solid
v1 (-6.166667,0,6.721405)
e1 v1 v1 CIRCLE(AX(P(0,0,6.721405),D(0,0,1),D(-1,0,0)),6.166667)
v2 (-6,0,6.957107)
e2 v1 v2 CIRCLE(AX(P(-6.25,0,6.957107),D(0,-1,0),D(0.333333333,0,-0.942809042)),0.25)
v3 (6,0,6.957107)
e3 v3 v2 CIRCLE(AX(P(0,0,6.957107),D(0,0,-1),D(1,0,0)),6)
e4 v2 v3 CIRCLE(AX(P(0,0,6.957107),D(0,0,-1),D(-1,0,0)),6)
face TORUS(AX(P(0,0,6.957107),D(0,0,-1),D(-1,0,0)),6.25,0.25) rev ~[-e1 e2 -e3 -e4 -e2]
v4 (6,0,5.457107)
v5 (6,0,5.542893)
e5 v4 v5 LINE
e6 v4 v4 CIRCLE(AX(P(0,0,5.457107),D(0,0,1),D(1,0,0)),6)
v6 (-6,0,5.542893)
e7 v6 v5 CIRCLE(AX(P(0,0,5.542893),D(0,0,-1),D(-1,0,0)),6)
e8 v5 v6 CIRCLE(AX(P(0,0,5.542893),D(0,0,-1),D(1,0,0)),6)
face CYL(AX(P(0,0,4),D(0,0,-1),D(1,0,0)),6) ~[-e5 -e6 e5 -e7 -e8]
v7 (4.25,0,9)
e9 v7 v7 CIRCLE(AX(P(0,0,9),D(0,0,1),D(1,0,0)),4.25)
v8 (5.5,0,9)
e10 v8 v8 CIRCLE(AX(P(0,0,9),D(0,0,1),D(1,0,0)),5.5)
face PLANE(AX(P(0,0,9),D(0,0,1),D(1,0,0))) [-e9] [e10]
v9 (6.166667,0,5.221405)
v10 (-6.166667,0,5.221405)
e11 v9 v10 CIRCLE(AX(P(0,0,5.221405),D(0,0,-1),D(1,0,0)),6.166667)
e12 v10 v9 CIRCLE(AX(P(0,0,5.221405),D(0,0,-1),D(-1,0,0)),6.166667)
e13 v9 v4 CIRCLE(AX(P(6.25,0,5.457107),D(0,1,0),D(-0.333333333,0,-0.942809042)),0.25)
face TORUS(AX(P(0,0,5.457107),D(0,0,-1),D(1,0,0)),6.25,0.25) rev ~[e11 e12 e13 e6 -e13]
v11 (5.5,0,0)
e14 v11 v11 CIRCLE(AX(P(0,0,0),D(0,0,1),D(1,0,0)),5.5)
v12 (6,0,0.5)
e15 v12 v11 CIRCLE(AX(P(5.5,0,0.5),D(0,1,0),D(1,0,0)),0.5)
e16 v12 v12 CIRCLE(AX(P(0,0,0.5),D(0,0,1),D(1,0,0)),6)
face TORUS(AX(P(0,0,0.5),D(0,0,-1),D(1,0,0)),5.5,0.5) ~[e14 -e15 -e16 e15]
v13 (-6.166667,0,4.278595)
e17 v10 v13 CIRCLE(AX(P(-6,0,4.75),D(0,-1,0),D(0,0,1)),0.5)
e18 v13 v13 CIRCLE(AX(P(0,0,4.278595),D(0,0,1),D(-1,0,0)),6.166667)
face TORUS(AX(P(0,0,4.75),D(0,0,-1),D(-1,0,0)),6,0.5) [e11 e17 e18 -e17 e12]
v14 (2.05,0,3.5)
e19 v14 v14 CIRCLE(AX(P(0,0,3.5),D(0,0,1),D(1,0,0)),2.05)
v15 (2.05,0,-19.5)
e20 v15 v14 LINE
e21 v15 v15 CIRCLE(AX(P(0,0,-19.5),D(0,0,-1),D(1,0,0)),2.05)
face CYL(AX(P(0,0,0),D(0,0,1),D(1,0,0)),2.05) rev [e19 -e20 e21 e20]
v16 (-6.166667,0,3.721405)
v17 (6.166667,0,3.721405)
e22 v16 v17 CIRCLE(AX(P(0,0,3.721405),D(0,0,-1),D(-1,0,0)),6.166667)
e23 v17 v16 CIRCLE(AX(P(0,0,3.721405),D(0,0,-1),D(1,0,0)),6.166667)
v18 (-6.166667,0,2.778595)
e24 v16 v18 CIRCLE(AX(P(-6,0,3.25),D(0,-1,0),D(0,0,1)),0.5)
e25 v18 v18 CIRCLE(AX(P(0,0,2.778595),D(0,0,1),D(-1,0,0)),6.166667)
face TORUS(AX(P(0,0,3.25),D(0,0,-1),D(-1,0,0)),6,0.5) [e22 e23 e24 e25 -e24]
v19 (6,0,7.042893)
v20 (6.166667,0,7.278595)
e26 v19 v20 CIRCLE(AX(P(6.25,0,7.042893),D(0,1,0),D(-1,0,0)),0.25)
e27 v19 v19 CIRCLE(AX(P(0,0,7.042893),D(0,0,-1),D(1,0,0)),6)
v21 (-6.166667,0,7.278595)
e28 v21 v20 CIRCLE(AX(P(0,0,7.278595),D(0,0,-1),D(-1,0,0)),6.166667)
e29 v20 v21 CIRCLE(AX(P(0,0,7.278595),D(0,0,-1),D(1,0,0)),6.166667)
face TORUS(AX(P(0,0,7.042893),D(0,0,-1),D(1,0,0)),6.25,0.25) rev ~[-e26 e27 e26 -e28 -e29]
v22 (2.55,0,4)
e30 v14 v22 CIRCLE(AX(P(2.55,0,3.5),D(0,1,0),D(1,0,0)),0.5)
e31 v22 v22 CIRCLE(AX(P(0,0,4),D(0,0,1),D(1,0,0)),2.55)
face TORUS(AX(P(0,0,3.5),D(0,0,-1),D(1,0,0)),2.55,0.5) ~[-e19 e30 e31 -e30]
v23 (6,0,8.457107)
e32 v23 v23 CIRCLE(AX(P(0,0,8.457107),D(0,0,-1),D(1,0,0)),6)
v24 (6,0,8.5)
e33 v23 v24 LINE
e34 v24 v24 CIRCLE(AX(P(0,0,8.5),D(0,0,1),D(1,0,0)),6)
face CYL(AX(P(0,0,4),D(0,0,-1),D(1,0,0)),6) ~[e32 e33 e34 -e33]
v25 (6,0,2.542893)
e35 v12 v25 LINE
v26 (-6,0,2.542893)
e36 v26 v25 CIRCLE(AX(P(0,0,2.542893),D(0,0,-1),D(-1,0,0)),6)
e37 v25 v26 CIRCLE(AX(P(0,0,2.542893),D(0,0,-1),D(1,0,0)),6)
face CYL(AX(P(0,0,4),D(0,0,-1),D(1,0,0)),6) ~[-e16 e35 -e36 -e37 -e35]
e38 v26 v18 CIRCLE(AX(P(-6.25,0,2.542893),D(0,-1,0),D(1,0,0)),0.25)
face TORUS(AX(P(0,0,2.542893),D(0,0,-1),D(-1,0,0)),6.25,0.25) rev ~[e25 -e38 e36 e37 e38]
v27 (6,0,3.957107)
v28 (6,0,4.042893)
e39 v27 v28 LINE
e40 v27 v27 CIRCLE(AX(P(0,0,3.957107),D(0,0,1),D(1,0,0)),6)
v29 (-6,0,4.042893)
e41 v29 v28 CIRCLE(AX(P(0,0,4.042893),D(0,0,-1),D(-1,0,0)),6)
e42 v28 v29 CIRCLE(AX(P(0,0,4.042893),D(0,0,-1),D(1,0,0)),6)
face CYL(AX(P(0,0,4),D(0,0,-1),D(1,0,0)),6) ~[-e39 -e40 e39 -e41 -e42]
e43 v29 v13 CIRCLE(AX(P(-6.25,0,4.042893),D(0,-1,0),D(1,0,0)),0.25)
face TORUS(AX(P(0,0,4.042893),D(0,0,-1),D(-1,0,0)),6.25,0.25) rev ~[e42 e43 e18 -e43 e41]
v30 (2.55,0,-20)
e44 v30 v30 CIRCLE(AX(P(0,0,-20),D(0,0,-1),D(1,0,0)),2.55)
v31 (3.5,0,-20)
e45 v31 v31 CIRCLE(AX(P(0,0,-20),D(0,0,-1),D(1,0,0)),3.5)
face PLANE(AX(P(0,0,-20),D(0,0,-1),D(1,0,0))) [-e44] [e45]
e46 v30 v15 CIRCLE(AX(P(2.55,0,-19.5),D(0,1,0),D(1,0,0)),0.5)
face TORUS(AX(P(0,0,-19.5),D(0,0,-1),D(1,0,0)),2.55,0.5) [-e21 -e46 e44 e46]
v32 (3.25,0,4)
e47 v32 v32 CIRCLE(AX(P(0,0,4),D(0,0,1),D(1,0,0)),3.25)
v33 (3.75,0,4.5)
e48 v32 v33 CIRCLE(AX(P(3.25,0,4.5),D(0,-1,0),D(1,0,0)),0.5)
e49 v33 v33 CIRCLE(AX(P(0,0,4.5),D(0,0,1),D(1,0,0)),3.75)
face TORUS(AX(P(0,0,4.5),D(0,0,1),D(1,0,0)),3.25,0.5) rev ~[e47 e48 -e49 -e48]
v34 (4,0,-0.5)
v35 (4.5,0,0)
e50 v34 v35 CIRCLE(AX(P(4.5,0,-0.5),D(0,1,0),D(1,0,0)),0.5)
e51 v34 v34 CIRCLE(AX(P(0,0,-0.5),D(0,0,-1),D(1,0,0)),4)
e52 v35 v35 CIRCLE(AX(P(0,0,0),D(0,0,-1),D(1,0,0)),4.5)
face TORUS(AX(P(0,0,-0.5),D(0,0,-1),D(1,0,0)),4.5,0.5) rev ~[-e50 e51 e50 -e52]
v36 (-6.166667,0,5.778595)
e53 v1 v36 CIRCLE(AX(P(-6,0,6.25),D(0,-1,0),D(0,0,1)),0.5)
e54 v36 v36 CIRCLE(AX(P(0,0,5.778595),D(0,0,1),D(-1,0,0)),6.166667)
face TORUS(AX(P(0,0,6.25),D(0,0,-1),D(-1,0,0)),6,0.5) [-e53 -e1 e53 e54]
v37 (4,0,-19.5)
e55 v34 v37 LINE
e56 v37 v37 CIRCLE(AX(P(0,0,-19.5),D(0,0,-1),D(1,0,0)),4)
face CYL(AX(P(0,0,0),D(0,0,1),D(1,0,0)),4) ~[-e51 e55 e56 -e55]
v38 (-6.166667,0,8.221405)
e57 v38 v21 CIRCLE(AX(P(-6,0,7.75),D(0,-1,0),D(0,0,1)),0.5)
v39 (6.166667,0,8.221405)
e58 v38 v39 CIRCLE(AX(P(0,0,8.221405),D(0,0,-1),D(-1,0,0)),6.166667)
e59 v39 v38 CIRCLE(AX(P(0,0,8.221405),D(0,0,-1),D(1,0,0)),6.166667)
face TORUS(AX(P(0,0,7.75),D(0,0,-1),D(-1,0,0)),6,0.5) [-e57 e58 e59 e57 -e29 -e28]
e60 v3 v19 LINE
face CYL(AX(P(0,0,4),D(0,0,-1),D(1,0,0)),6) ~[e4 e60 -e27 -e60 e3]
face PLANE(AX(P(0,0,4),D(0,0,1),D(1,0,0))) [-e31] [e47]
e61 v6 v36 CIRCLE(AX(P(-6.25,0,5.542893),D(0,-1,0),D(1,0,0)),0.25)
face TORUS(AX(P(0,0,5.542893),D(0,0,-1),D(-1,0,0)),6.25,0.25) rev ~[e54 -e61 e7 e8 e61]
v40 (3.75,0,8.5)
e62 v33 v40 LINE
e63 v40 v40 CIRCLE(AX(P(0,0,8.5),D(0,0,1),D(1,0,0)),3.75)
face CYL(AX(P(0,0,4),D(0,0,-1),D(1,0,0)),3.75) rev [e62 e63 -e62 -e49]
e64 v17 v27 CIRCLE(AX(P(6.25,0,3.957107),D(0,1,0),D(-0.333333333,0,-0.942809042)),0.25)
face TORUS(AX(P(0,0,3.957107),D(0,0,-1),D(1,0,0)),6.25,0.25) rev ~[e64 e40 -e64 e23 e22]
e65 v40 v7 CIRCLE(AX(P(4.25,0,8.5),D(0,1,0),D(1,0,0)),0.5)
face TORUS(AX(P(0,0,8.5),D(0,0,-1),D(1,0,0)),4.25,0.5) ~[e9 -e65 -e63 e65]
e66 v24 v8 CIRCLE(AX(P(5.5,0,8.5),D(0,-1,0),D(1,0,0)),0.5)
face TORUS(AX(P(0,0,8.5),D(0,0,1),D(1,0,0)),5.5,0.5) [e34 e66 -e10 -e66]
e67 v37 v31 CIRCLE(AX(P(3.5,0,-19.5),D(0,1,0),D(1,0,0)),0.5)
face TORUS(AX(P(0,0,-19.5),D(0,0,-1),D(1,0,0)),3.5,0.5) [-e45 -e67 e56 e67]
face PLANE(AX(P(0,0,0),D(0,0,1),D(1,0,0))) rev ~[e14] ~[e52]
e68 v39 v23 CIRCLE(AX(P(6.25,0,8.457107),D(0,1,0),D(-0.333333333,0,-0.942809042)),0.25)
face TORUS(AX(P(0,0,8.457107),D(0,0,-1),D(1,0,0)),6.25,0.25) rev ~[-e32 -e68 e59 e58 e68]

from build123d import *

# Parameters (mm, degrees)
F0_R          = 6
F0_R_2        = 2.05
F1_DEPTH      = 4
F2_R          = 6
F2_R_2        = 3.75
F3_DEPTH      = 5
F4_R          = 0.5
F5_R          = 4
F5_R_2        = 2.05
F6_DEPTH      = 20
F7_R          = 0.5
F10_T3_ANGLE  = 180
F10_T6_ANGLE  = 180
F10_T9_ANGLE  = 180
F10_T12_ANGLE = 180
F10_T15_ANGLE = 180
F10_T18_ANGLE = 180
F10_T21_ANGLE = 180
F10_T24_ANGLE = 180
F10_T27_ANGLE = 180
F10_T30_ANGLE = 180
F10_T33_ANGLE = 180
F10_T36_ANGLE = 180
F10_T39_ANGLE = 180
F10_T42_ANGLE = 180
F10_T45_ANGLE = 180
F10_T48_ANGLE = 180


# Not quite as in the source:
# - a fillet or chamfer that OpenCascade refuses, or shapes differently, is made with other operations: its cross-section is extruded or revolved along the edge and cut away or added


with BuildPart() as f1:
    # F0 (on Top) → F1 (new body)
    with BuildSketch(Plane.XY):
        Circle(F0_R)
        Circle(F0_R_2, mode=Mode.SUBTRACT)
    extrude(amount=F1_DEPTH)

    # F2 (on face) → F3 (join)
    with BuildSketch(Plane.XY.offset(4)):
        Circle(F2_R)
        Circle(F2_R_2, mode=Mode.SUBTRACT)
    extrude(amount=F3_DEPTH)

    # F4
    f4_edges = [f1.edges().sort_by_distance(p)[0] for p in [
        (-3.75, 0, 4),
        (-2.05, 0, 4),
        (-6, 0, 9),
        (-3.75, 0, 9),
    ]]
    fillet(f4_edges, radius=F4_R)

    # F5 (on face) → F6 (join)
    with BuildSketch(Plane(origin=(0, 0, 0), x_dir=(1, 0, 0), z_dir=(0, 0, -1))):
        Circle(F5_R)
        Circle(F5_R_2, mode=Mode.SUBTRACT)
    extrude(amount=F6_DEPTH)

    # F7
    f7_edges = [f1.edges().sort_by_distance(p)[0] for p in [
        (-6, 0, 0),
        (-4, 0, 0),
        (-4, 0, -20),
        (-2.05, 0, -20),
    ]]
    fillet(f7_edges, radius=F7_R)

    # F8 (on Front) → F9 (revolve)
    with BuildSketch(Plane.XZ):
        with BuildLine():
            ThreePointArc((-6, 3.75), (-6.5, 3.25), (-6, 2.75))
            Line((-6, 2.75), (-6, 3.75))
        make_face()
        with BuildLine():
            ThreePointArc((-6, 8.25), (-6.5, 7.75), (-6, 7.25))
            Line((-6, 7.25), (-6, 8.25))
        make_face()
        with BuildLine():
            Line((-6, 8.25), (-6, 7.25))
            ThreePointArc((-6, 7.25), (-5.6464466094, 7.3964466094), (-5.5, 7.75))
            ThreePointArc((-5.5, 7.75), (-5.6464466094, 8.1035533906), (-6, 8.25))
        make_face()
        with BuildLine():
            ThreePointArc((-6, 6.75), (-6.5, 6.25), (-6, 5.75))
            Line((-6, 5.75), (-6, 6.75))
        make_face()
        with BuildLine():
            Line((-6, 6.75), (-6, 5.75))
            ThreePointArc((-6, 5.75), (-5.6464466094, 5.8964466094), (-5.5, 6.25))
            ThreePointArc((-5.5, 6.25), (-5.6464466094, 6.6035533906), (-6, 6.75))
        make_face()
        with BuildLine():
            ThreePointArc((-6, 5.25), (-6.5, 4.75), (-6, 4.25))
            Line((-6, 4.25), (-6, 5.25))
        make_face()
        with BuildLine():
            Line((-6, 5.25), (-6, 4.25))
            ThreePointArc((-6, 4.25), (-5.6464466094, 4.3964466094), (-5.5, 4.75))
            ThreePointArc((-5.5, 4.75), (-5.6464466094, 5.1035533906), (-6, 5.25))
        make_face()
        with BuildLine():
            Line((-6, 3.75), (-6, 2.75))
            ThreePointArc((-6, 2.75), (-5.6464466094, 2.8964466094), (-5.5, 3.25))
            ThreePointArc((-5.5, 3.25), (-5.6464466094, 3.6035533906), (-6, 3.75))
        make_face()
    revolve(axis=Axis((0, 0, 0), (0, 0, -1)))

    # F10: fillet of radius 0.25 on 23 edges, made by hand


with BuildPart() as f10_tool1:
    # F10_s2 → F10_t3 (revolve)
    with BuildSketch(Plane.XZ):
        with BuildLine():
            ThreePointArc((-6.1666666667, 6.7214045208), (-6.0458758548, 6.8127692139), (-6, 6.9571067812))
            Line((-6, 6.9571067812), (-6, 6.75))
            ThreePointArc((-6, 6.75), (-6.0845509894, 6.7427992798), (-6.1666666667, 6.7214045208))
        make_face()
    revolve(axis=Axis((0, 0, 6.75), (0, 0, -1)), revolution_arc=F10_T3_ANGLE)


with BuildPart() as f10_tool4:
    # F10_s5 → F10_t6 (revolve)
    with BuildSketch(Plane.XZ):
        with BuildLine():
            ThreePointArc((6.1666666667, 6.7214045208), (6.0458758548, 6.8127692139), (6, 6.9571067812))
            Line((6, 6.9571067812), (6, 6.75))
            ThreePointArc((6, 6.75), (6.0845509894, 6.7427992798), (6.1666666667, 6.7214045208))
        make_face()
    revolve(axis=Axis((0, 0, 6.75), (0, 0, -1)), revolution_arc=F10_T6_ANGLE)


with BuildPart() as f10_tool7:
    # F10_s8 → F10_t9 (revolve)
    with BuildSketch(Plane.XZ):
        with BuildLine():
            ThreePointArc((6, 7.0428932188), (6.0458758548, 7.1872307861), (6.1666666667, 7.2785954792))
            ThreePointArc((6.1666666667, 7.2785954792), (6.0845509894, 7.2572007202), (6, 7.25))
            Line((6, 7.25), (6, 7.0428932188))
        make_face()
    revolve(axis=Axis((0, 0, 7.25), (0, 0, -1)), revolution_arc=F10_T9_ANGLE)


with BuildPart() as f10_tool10:
    # F10_s11 → F10_t12 (revolve)
    with BuildSketch(Plane.XZ):
        with BuildLine():
            ThreePointArc((-6, 7.0428932188), (-6.0458758548, 7.1872307861), (-6.1666666667, 7.2785954792))
            ThreePointArc((-6.1666666667, 7.2785954792), (-6.0845509894, 7.2572007202), (-6, 7.25))
            Line((-6, 7.25), (-6, 7.0428932188))
        make_face()
    revolve(axis=Axis((0, 0, 7.25), (0, 0, -1)), revolution_arc=F10_T12_ANGLE)


with BuildPart() as f10_tool13:
    # F10_s14 → F10_t15 (revolve)
    with BuildSketch(Plane.XZ):
        with BuildLine():
            ThreePointArc((-6.1666666667, 5.2214045208), (-6.0458758548, 5.3127692139), (-6, 5.4571067812))
            Line((-6, 5.4571067812), (-6, 5.25))
            ThreePointArc((-6, 5.25), (-6.0845509894, 5.2427992798), (-6.1666666667, 5.2214045208))
        make_face()
    revolve(axis=Axis((0, 0, 5.25), (0, 0, -1)), revolution_arc=F10_T15_ANGLE)


with BuildPart() as f10_tool16:
    # F10_s17 → F10_t18 (revolve)
    with BuildSketch(Plane.XZ):
        with BuildLine():
            ThreePointArc((6.1666666667, 5.2214045208), (6.0458758548, 5.3127692139), (6, 5.4571067812))
            Line((6, 5.4571067812), (6, 5.25))
            ThreePointArc((6, 5.25), (6.0845509894, 5.2427992798), (6.1666666667, 5.2214045208))
        make_face()
    revolve(axis=Axis((0, 0, 5.25), (0, 0, -1)), revolution_arc=F10_T18_ANGLE)


with BuildPart() as f10_tool19:
    # F10_s20 → F10_t21 (revolve)
    with BuildSketch(Plane.XZ):
        with BuildLine():
            ThreePointArc((6, 5.5428932188), (6.0458758548, 5.6872307861), (6.1666666667, 5.7785954792))
            ThreePointArc((6.1666666667, 5.7785954792), (6.0845509894, 5.7572007202), (6, 5.75))
            Line((6, 5.75), (6, 5.5428932188))
        make_face()
    revolve(axis=Axis((0, 0, 5.75), (0, 0, -1)), revolution_arc=F10_T21_ANGLE)


with BuildPart() as f10_tool22:
    # F10_s23 → F10_t24 (revolve)
    with BuildSketch(Plane.XZ):
        with BuildLine():
            ThreePointArc((-6, 5.5428932188), (-6.0458758548, 5.6872307861), (-6.1666666667, 5.7785954792))
            ThreePointArc((-6.1666666667, 5.7785954792), (-6.0845509894, 5.7572007202), (-6, 5.75))
            Line((-6, 5.75), (-6, 5.5428932188))
        make_face()
    revolve(axis=Axis((0, 0, 5.75), (0, 0, -1)), revolution_arc=F10_T24_ANGLE)


with BuildPart() as f10_tool25:
    # F10_s26 → F10_t27 (revolve)
    with BuildSketch(Plane.XZ):
        with BuildLine():
            ThreePointArc((-6.1666666667, 3.7214045208), (-6.0458758548, 3.8127692139), (-6, 3.9571067812))
            Line((-6, 3.9571067812), (-6, 3.75))
            ThreePointArc((-6, 3.75), (-6.0845509894, 3.7427992798), (-6.1666666667, 3.7214045208))
        make_face()
    revolve(axis=Axis((0, 0, 3.75), (0, 0, -1)), revolution_arc=F10_T27_ANGLE)


with BuildPart() as f10_tool28:
    # F10_s29 → F10_t30 (revolve)
    with BuildSketch(Plane.XZ):
        with BuildLine():
            ThreePointArc((6.1666666667, 3.7214045208), (6.0458758548, 3.8127692139), (6, 3.9571067812))
            Line((6, 3.9571067812), (6, 3.75))
            ThreePointArc((6, 3.75), (6.0845509894, 3.7427992798), (6.1666666667, 3.7214045208))
        make_face()
    revolve(axis=Axis((0, 0, 3.75), (0, 0, -1)), revolution_arc=F10_T30_ANGLE)


with BuildPart() as f10_tool31:
    # F10_s32 → F10_t33 (revolve)
    with BuildSketch(Plane.XZ):
        with BuildLine():
            ThreePointArc((6, 4.0428932188), (6.0458758548, 4.1872307861), (6.1666666667, 4.2785954792))
            ThreePointArc((6.1666666667, 4.2785954792), (6.0845509894, 4.2572007202), (6, 4.25))
            Line((6, 4.25), (6, 4.0428932188))
        make_face()
    revolve(axis=Axis((0, 0, 4.25), (0, 0, -1)), revolution_arc=F10_T33_ANGLE)


with BuildPart() as f10_tool34:
    # F10_s35 → F10_t36 (revolve)
    with BuildSketch(Plane.XZ):
        with BuildLine():
            ThreePointArc((-6, 4.0428932188), (-6.0458758548, 4.1872307861), (-6.1666666667, 4.2785954792))
            ThreePointArc((-6.1666666667, 4.2785954792), (-6.0845509894, 4.2572007202), (-6, 4.25))
            Line((-6, 4.25), (-6, 4.0428932188))
        make_face()
    revolve(axis=Axis((0, 0, 4.25), (0, 0, -1)), revolution_arc=F10_T36_ANGLE)


with BuildPart() as f10_tool37:
    # F10_s38 → F10_t39 (revolve)
    with BuildSketch(Plane.XZ):
        with BuildLine():
            ThreePointArc((6, 2.5428932188), (6.0458758548, 2.6872307861), (6.1666666667, 2.7785954792))
            ThreePointArc((6.1666666667, 2.7785954792), (6.0845509894, 2.7572007202), (6, 2.75))
            Line((6, 2.75), (6, 2.5428932188))
        make_face()
    revolve(axis=Axis((0, 0, 2.75), (0, 0, -1)), revolution_arc=F10_T39_ANGLE)


with BuildPart() as f10_tool40:
    # F10_s41 → F10_t42 (revolve)
    with BuildSketch(Plane.XZ):
        with BuildLine():
            ThreePointArc((-6, 2.5428932188), (-6.0458758548, 2.6872307861), (-6.1666666667, 2.7785954792))
            ThreePointArc((-6.1666666667, 2.7785954792), (-6.0845509894, 2.7572007202), (-6, 2.75))
            Line((-6, 2.75), (-6, 2.5428932188))
        make_face()
    revolve(axis=Axis((0, 0, 2.75), (0, 0, -1)), revolution_arc=F10_T42_ANGLE)


with BuildPart() as f10_tool43:
    # F10_s44 → F10_t45 (revolve)
    with BuildSketch(Plane.XZ):
        with BuildLine():
            ThreePointArc((-6.1666666667, 8.2214045208), (-6.0458758548, 8.3127692139), (-6, 8.4571067812))
            Line((-6, 8.4571067812), (-6, 8.25))
            ThreePointArc((-6, 8.25), (-6.0845509894, 8.2427992798), (-6.1666666667, 8.2214045208))
        make_face()
    revolve(axis=Axis((0, 0, 8.25), (0, 0, -1)), revolution_arc=F10_T45_ANGLE)


with BuildPart() as f10_tool46:
    # F10_s47 → F10_t48 (revolve)
    with BuildSketch(Plane.XZ):
        with BuildLine():
            ThreePointArc((6.1666666667, 8.2214045208), (6.0458758548, 8.3127692139), (6, 8.4571067812))
            Line((6, 8.4571067812), (6, 8.25))
            ThreePointArc((6, 8.25), (6.0845509894, 8.2427992798), (6.1666666667, 8.2214045208))
        make_face()
    revolve(axis=Axis((0, 0, 8.25), (0, 0, -1)), revolution_arc=F10_T48_ANGLE)


with BuildPart() as f1_1:
    add(f1.part)

    # F10_t49: union F10_tool1, F10_tool4, F10_tool7, F10_tool10, F10_tool13, F10_tool16, F10_tool19, F10_tool22, F10_tool25, F10_tool28, F10_tool31, F10_tool34, F10_tool37, F10_tool40, F10_tool43, F10_tool46
    add([f10_tool1.part, f10_tool4.part, f10_tool7.part, f10_tool10.part, f10_tool13.part, f10_tool16.part, f10_tool19.part, f10_tool22.part, f10_tool25.part, f10_tool28.part, f10_tool31.part, f10_tool34.part, f10_tool37.part, f10_tool40.part, f10_tool43.part, f10_tool46.part])


solid = f1_1.part
